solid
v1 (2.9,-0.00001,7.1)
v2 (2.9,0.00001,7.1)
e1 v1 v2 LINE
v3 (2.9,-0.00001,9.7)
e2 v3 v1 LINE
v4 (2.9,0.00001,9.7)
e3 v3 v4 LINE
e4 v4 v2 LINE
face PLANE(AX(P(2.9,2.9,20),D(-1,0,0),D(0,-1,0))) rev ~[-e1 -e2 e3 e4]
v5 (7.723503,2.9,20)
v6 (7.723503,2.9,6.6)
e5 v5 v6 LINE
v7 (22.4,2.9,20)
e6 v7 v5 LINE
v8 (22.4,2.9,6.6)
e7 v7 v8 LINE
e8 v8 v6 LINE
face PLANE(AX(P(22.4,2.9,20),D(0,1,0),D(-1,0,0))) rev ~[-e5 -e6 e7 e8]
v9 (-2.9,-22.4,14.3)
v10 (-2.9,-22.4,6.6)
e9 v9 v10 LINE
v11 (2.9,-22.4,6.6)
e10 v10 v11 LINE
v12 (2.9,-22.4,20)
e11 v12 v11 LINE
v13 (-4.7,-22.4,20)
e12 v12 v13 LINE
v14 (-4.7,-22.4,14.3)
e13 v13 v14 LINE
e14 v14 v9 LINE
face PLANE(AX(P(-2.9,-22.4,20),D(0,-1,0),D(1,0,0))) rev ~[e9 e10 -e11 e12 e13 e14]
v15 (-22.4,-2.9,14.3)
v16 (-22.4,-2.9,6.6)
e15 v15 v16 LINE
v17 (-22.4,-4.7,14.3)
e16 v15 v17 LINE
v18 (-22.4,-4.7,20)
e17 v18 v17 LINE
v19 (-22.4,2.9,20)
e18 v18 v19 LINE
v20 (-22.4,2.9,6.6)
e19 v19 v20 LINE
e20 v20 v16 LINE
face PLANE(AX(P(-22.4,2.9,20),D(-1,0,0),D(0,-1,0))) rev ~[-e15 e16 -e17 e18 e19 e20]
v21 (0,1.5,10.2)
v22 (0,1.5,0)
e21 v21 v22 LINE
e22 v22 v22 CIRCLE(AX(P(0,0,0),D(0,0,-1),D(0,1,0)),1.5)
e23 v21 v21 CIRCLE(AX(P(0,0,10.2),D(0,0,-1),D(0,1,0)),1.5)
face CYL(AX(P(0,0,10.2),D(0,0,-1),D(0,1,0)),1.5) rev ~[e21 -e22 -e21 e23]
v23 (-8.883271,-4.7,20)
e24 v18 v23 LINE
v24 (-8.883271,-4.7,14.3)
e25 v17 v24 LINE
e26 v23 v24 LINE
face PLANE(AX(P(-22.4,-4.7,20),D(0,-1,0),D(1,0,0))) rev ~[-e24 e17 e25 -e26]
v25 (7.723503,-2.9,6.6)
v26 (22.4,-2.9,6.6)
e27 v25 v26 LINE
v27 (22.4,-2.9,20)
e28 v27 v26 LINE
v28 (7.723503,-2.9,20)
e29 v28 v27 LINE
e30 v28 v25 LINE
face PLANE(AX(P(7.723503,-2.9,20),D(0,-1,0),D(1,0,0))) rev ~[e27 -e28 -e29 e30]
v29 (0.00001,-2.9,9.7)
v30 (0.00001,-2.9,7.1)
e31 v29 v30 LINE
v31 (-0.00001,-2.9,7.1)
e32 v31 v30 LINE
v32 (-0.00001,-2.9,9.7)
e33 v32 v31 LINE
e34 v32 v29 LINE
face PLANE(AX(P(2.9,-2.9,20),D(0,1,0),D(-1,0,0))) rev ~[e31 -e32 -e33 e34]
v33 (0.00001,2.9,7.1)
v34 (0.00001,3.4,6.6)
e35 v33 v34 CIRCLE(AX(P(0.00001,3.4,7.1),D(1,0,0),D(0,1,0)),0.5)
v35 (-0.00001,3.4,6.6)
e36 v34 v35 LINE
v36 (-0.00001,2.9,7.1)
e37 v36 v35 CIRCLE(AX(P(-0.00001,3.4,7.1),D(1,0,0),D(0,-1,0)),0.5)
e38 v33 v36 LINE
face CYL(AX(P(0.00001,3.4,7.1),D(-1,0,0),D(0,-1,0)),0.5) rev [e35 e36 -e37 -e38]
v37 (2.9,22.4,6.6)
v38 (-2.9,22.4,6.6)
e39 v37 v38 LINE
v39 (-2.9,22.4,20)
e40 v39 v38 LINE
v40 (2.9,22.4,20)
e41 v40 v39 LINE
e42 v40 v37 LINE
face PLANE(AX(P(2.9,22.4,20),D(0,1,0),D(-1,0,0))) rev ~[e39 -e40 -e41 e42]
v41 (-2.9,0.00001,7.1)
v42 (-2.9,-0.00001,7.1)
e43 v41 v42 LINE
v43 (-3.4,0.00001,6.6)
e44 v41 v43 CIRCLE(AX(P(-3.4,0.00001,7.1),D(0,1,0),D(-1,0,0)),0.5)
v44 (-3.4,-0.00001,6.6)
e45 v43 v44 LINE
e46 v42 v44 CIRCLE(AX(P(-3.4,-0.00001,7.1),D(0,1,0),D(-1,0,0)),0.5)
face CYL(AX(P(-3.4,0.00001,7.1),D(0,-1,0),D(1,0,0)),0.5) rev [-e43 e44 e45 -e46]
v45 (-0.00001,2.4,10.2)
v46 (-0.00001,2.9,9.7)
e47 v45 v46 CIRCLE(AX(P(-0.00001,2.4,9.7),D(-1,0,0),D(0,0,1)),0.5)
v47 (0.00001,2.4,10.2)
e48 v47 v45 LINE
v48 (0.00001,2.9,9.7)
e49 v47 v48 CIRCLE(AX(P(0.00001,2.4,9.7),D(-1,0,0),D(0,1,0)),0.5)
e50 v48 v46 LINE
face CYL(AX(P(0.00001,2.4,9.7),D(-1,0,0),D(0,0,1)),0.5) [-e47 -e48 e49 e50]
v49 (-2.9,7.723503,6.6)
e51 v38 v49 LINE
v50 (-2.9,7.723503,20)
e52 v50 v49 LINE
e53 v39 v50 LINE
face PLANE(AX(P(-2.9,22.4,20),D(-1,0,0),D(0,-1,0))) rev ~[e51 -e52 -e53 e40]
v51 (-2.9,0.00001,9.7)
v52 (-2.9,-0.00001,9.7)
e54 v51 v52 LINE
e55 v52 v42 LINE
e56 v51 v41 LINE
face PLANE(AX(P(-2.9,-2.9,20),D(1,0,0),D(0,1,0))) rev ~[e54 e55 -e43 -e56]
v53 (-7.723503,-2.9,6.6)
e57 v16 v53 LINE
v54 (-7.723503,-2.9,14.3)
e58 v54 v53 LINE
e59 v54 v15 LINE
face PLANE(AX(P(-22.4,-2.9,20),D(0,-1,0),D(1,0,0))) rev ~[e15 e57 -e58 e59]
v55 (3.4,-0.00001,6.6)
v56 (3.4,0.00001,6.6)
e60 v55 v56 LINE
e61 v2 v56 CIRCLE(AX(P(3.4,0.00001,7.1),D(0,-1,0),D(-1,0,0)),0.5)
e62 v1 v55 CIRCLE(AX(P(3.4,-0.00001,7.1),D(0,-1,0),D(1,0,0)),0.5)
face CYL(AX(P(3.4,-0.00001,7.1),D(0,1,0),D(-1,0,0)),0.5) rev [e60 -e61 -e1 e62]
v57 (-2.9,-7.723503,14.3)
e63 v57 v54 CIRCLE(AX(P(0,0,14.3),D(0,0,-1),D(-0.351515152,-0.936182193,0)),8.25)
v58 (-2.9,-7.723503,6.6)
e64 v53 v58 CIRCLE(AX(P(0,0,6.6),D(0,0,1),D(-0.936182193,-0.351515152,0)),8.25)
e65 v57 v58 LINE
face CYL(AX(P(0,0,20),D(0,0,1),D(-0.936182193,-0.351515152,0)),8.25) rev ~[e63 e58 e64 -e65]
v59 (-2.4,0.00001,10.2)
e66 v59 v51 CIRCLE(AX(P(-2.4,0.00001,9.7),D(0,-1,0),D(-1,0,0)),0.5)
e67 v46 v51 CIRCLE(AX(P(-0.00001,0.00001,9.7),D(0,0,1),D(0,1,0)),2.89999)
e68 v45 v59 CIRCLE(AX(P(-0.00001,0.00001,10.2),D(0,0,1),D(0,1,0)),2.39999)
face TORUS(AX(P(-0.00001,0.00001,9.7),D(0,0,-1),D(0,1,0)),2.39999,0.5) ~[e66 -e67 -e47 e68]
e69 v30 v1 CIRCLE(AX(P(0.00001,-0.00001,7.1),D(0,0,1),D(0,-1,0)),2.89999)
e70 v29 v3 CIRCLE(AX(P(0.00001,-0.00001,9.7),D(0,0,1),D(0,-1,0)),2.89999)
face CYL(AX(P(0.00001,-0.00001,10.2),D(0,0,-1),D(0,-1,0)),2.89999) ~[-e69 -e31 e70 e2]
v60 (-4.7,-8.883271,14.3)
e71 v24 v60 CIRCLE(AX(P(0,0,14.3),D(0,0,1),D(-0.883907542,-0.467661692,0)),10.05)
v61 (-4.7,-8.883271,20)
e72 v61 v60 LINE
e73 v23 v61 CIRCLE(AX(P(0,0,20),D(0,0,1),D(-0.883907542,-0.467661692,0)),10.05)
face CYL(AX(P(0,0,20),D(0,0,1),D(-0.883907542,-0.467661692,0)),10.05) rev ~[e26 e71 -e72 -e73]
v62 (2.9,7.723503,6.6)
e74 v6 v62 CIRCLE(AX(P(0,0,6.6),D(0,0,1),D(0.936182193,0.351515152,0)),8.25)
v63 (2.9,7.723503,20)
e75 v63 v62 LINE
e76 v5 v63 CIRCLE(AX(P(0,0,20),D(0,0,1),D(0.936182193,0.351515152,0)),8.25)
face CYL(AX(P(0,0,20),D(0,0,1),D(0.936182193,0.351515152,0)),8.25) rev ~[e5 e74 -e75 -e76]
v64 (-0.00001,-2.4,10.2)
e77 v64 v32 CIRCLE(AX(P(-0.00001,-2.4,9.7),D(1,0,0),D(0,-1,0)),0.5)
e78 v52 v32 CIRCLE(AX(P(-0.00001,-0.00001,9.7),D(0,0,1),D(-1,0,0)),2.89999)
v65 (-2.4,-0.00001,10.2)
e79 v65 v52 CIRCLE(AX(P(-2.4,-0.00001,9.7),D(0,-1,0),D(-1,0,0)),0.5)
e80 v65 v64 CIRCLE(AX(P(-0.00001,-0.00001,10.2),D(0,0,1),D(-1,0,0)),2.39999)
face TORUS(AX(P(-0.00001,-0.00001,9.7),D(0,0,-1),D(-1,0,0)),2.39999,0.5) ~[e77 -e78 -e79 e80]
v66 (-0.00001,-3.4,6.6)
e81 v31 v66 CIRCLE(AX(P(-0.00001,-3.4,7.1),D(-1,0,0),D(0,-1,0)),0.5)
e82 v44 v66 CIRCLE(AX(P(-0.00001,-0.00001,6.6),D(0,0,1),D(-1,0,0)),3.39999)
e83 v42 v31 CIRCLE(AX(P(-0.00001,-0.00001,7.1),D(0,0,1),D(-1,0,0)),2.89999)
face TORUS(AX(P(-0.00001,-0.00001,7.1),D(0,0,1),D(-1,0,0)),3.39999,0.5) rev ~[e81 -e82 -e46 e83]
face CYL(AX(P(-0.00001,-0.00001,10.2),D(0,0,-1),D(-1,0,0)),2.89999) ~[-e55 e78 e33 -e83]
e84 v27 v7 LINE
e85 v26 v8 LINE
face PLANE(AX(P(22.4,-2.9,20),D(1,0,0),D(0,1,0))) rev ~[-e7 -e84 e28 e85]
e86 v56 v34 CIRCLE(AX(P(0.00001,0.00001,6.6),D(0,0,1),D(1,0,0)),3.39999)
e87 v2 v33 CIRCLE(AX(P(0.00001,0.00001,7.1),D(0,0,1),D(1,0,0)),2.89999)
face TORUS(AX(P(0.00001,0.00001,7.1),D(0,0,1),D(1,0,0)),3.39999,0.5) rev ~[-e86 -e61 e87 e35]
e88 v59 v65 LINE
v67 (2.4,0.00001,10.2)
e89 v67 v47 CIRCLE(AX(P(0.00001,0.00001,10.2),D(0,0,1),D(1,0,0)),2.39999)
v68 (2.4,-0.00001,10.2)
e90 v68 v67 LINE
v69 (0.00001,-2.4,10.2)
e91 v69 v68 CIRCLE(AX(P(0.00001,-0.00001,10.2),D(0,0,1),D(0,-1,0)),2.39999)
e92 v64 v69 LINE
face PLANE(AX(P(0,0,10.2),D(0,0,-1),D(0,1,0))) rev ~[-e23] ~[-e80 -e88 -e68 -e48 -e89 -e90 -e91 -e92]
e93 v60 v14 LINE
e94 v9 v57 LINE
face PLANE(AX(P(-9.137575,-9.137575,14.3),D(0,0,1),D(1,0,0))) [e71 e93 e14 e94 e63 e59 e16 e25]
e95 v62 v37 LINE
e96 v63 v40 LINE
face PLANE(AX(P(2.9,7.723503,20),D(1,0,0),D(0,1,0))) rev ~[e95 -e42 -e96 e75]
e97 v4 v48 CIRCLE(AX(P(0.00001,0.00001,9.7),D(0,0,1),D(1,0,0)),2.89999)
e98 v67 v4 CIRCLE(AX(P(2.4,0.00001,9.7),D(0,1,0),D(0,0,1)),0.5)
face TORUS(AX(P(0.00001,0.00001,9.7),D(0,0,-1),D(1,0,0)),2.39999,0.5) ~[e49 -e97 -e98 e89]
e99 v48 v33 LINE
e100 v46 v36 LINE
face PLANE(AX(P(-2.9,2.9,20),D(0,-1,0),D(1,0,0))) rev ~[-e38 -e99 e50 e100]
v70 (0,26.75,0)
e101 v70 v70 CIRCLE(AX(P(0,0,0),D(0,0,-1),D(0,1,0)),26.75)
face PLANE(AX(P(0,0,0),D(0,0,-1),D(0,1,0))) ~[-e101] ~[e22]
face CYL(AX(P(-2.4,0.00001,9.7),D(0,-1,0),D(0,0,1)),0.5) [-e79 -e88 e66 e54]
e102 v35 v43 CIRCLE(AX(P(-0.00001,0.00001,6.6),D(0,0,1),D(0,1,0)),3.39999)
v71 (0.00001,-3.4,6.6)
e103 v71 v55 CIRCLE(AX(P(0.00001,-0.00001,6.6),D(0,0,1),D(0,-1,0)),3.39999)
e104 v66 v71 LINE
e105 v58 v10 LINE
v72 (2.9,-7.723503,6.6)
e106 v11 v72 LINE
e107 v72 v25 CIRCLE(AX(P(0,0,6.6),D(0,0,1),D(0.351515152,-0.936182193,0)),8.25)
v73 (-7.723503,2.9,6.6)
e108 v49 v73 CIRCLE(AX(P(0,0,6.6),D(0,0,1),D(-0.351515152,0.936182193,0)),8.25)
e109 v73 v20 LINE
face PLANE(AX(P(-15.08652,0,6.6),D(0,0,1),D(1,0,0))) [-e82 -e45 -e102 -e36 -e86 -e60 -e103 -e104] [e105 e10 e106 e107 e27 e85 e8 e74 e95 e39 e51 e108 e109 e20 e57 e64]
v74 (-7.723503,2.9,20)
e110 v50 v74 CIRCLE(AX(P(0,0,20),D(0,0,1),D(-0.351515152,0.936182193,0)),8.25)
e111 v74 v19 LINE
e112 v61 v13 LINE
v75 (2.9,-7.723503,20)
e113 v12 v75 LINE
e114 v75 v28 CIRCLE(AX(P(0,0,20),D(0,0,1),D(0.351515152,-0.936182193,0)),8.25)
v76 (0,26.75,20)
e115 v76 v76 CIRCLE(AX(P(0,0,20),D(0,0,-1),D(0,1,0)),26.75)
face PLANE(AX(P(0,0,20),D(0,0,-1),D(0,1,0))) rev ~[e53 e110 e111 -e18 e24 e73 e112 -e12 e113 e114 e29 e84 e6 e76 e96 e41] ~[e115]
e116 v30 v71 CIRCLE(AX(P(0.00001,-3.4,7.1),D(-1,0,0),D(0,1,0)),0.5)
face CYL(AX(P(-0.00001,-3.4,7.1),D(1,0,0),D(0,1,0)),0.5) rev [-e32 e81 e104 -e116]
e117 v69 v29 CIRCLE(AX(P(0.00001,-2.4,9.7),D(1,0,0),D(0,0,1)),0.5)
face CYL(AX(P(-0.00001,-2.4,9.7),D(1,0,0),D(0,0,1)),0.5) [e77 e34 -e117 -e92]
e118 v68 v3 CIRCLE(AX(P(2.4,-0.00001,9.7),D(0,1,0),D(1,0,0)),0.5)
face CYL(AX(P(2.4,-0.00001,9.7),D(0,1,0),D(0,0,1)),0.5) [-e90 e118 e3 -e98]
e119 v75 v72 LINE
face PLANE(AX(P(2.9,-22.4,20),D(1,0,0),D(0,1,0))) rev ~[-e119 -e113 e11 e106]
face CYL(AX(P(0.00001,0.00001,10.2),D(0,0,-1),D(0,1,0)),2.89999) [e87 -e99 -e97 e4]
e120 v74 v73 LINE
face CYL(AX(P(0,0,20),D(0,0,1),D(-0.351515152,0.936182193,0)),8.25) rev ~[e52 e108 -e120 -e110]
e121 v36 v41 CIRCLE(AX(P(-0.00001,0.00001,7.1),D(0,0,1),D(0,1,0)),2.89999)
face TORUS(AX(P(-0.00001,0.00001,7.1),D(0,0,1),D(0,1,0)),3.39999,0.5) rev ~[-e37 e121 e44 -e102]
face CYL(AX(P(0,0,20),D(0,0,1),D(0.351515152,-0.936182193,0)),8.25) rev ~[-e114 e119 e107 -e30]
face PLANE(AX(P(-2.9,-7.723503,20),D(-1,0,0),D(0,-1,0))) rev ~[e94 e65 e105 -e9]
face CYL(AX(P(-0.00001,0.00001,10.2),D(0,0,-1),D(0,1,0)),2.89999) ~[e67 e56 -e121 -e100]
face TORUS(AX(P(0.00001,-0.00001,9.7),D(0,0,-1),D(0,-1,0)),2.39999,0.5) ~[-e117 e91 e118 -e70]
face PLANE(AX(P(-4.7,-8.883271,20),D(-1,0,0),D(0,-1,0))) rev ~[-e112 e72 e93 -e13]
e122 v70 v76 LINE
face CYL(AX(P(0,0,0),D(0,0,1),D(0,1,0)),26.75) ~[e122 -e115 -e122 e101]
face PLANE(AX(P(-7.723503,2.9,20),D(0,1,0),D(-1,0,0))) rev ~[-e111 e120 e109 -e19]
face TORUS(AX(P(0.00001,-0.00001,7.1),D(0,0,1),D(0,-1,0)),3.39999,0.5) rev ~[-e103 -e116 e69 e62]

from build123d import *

# Parameters (mm, degrees)
F3_DEPTH = 13.4
F5_R     = 2.89999
F6_R     = 0.5
F7_DEPTH = 5.7


# Not quite as in the source:
# - a fillet or chamfer is up to 0.001 mm smaller than in the source, because OpenCascade refuses the exact size


with BuildPart() as f1:
    # F0 (on Right) → F1 (revolve)
    with BuildSketch(Plane.YZ):
        Polygon((1.5, 10.2), (1.5, 0), (26.75, 0), (26.75, 20), (4.125, 20), (4.125, 10.2), align=None)
    revolve(axis=Axis((0, 0, 0.3519081866), (0, 0, -1)))

    # F2 (on face) → F3 (cut)
    with BuildSketch(Plane.XY.offset(20)):
        with BuildLine():
            Line((-22.4, 2.9), (-22.4, -2.9))
            Line((-22.4, -2.9), (-7.7235030912, -2.9))
            ThreePointArc((-7.7235030912, -2.9), (-8.25, 0), (-7.7235030912, 2.9))
            Line((-7.7235030912, 2.9), (-22.4, 2.9))
        make_face()
        with BuildLine():
            ThreePointArc((-7.7235030912, 2.9), (-8.25, 0), (-7.7235030912, -2.9))
            Line((-7.7235030912, -2.9), (-2.9, -2.9))
            Line((-2.9, -2.9), (-2.9, 2.9))
            Line((-2.9, 2.9), (-7.7235030912, 2.9))
        make_face()
        with BuildLine():
            Line((-2.9, -2.9), (-7.7235030912, -2.9))
            ThreePointArc((-7.7235030912, -2.9), (-5.8336309448, -5.8336309448), (-2.9, -7.7235030912))
            Line((-2.9, -7.7235030912), (-2.9, -2.9))
        make_face()
        with BuildLine():
            Line((2.9, -2.9), (-2.9, -2.9))
            Line((-2.9, -2.9), (-2.9, -7.7235030912))
            ThreePointArc((-2.9, -7.7235030912), (0, -8.25), (2.9, -7.7235030912))
            Line((2.9, -7.7235030912), (2.9, -2.9))
        make_face()
        with BuildLine():
            ThreePointArc((-2.9, 7.7235030912), (-5.8336309448, 5.8336309448), (-7.7235030912, 2.9))
            Line((-7.7235030912, 2.9), (-2.9, 2.9))
            Line((-2.9, 2.9), (-2.9, 7.7235030912))
        make_face()
        with BuildLine():
            ThreePointArc((2.9, -7.7235030912), (0, -8.25), (-2.9, -7.7235030912))
            Line((-2.9, -7.7235030912), (-2.9, -22.4))
            Line((-2.9, -22.4), (2.9, -22.4))
            Line((2.9, -22.4), (2.9, -7.7235030912))
        make_face()
        with BuildLine():
            Line((2.9, 2.9), (2.9, -2.9))
            Line((2.9, -2.9), (7.7235030912, -2.9))
            ThreePointArc((7.7235030912, -2.9), (8.1173086828, -1.4737027342), (8.25, 0))
            ThreePointArc((8.25, 0), (8.1173086828, 1.4737027342), (7.7235030912, 2.9))
            Line((7.7235030912, 2.9), (2.9, 2.9))
        make_face()
        with BuildLine():
            Line((7.7235030912, -2.9), (2.9, -2.9))
            Line((2.9, -2.9), (2.9, -7.7235030912))
            ThreePointArc((2.9, -7.7235030912), (5.8336309448, -5.8336309448), (7.7235030912, -2.9))
        make_face()
        with BuildLine():
            Line((-2.9, 7.7235030912), (-2.9, 2.9))
            Line((-2.9, 2.9), (2.9, 2.9))
            Line((2.9, 2.9), (2.9, 7.7235030912))
            ThreePointArc((2.9, 7.7235030912), (0, 8.25), (-2.9, 7.7235030912))
        make_face()
        with BuildLine():
            Line((-2.9, 22.4), (-2.9, 7.7235030912))
            ThreePointArc((-2.9, 7.7235030912), (0, 8.25), (2.9, 7.7235030912))
            Line((2.9, 7.7235030912), (2.9, 22.4))
            Line((2.9, 22.4), (-2.9, 22.4))
        make_face()
        with BuildLine():
            ThreePointArc((8.25, 0), (8.1173086828, -1.4737027342), (7.7235030912, -2.9))
            Line((7.7235030912, -2.9), (22.4, -2.9))
            Line((22.4, -2.9), (22.4, 2.9))
            Line((22.4, 2.9), (7.7235030912, 2.9))
            ThreePointArc((7.7235030912, 2.9), (8.1173086828, 1.4737027342), (8.25, 0))
        make_face()
        with BuildLine():
            Line((2.9, 7.7235030912), (2.9, 2.9))
            Line((2.9, 2.9), (7.7235030912, 2.9))
            ThreePointArc((7.7235030912, 2.9), (5.8336309448, 5.8336309448), (2.9, 7.7235030912))
        make_face()
    extrude(amount=-F3_DEPTH, mode=Mode.SUBTRACT)

    # F5 (radius 2.9 in the source; OpenCascade refuses exactly that, so slightly less here)
    f5_edges = [f1.edges().sort_by_distance(p)[0] for p in [
        (2.9, 2.9, 8.4),
        (-2.9, -2.9, 8.4),
        (-2.9, 2.9, 8.4),
        (2.9, -2.9, 8.4),
    ]]
    fillet(f5_edges, radius=F5_R)

    # F6
    f6_edges = [f1.edges().sort_by_distance(p)[0] for p in [
        (-2.050613, -2.050613, 6.6),
        (-2.050613, -2.050613, 10.2),
    ]]
    fillet(f6_edges, radius=F6_R)

    # F4 (on face) → F7 (cut)
    with BuildSketch(Plane.XY.offset(20)):
        with BuildLine():
            Line((-4.7, -8.883270794), (-4.7, -22.4))
            Line((-4.7, -22.4), (-2.9, -22.4))
            Line((-2.9, -22.4), (-2.9, -7.7235030912))
            ThreePointArc((-2.9, -7.7235030912), (-5.8336309448, -5.8336309448), (-7.7235030912, -2.9))
            Line((-7.7235030912, -2.9), (-22.4, -2.9))
            Line((-22.4, -2.9), (-22.4, -4.7))
            Line((-22.4, -4.7), (-8.883270794, -4.7))
            ThreePointArc((-8.883270794, -4.7), (-7.1064231509, -7.1064231509), (-4.7, -8.883270794))
        make_face()
    extrude(amount=-F7_DEPTH, mode=Mode.SUBTRACT)


solid = f1.part
